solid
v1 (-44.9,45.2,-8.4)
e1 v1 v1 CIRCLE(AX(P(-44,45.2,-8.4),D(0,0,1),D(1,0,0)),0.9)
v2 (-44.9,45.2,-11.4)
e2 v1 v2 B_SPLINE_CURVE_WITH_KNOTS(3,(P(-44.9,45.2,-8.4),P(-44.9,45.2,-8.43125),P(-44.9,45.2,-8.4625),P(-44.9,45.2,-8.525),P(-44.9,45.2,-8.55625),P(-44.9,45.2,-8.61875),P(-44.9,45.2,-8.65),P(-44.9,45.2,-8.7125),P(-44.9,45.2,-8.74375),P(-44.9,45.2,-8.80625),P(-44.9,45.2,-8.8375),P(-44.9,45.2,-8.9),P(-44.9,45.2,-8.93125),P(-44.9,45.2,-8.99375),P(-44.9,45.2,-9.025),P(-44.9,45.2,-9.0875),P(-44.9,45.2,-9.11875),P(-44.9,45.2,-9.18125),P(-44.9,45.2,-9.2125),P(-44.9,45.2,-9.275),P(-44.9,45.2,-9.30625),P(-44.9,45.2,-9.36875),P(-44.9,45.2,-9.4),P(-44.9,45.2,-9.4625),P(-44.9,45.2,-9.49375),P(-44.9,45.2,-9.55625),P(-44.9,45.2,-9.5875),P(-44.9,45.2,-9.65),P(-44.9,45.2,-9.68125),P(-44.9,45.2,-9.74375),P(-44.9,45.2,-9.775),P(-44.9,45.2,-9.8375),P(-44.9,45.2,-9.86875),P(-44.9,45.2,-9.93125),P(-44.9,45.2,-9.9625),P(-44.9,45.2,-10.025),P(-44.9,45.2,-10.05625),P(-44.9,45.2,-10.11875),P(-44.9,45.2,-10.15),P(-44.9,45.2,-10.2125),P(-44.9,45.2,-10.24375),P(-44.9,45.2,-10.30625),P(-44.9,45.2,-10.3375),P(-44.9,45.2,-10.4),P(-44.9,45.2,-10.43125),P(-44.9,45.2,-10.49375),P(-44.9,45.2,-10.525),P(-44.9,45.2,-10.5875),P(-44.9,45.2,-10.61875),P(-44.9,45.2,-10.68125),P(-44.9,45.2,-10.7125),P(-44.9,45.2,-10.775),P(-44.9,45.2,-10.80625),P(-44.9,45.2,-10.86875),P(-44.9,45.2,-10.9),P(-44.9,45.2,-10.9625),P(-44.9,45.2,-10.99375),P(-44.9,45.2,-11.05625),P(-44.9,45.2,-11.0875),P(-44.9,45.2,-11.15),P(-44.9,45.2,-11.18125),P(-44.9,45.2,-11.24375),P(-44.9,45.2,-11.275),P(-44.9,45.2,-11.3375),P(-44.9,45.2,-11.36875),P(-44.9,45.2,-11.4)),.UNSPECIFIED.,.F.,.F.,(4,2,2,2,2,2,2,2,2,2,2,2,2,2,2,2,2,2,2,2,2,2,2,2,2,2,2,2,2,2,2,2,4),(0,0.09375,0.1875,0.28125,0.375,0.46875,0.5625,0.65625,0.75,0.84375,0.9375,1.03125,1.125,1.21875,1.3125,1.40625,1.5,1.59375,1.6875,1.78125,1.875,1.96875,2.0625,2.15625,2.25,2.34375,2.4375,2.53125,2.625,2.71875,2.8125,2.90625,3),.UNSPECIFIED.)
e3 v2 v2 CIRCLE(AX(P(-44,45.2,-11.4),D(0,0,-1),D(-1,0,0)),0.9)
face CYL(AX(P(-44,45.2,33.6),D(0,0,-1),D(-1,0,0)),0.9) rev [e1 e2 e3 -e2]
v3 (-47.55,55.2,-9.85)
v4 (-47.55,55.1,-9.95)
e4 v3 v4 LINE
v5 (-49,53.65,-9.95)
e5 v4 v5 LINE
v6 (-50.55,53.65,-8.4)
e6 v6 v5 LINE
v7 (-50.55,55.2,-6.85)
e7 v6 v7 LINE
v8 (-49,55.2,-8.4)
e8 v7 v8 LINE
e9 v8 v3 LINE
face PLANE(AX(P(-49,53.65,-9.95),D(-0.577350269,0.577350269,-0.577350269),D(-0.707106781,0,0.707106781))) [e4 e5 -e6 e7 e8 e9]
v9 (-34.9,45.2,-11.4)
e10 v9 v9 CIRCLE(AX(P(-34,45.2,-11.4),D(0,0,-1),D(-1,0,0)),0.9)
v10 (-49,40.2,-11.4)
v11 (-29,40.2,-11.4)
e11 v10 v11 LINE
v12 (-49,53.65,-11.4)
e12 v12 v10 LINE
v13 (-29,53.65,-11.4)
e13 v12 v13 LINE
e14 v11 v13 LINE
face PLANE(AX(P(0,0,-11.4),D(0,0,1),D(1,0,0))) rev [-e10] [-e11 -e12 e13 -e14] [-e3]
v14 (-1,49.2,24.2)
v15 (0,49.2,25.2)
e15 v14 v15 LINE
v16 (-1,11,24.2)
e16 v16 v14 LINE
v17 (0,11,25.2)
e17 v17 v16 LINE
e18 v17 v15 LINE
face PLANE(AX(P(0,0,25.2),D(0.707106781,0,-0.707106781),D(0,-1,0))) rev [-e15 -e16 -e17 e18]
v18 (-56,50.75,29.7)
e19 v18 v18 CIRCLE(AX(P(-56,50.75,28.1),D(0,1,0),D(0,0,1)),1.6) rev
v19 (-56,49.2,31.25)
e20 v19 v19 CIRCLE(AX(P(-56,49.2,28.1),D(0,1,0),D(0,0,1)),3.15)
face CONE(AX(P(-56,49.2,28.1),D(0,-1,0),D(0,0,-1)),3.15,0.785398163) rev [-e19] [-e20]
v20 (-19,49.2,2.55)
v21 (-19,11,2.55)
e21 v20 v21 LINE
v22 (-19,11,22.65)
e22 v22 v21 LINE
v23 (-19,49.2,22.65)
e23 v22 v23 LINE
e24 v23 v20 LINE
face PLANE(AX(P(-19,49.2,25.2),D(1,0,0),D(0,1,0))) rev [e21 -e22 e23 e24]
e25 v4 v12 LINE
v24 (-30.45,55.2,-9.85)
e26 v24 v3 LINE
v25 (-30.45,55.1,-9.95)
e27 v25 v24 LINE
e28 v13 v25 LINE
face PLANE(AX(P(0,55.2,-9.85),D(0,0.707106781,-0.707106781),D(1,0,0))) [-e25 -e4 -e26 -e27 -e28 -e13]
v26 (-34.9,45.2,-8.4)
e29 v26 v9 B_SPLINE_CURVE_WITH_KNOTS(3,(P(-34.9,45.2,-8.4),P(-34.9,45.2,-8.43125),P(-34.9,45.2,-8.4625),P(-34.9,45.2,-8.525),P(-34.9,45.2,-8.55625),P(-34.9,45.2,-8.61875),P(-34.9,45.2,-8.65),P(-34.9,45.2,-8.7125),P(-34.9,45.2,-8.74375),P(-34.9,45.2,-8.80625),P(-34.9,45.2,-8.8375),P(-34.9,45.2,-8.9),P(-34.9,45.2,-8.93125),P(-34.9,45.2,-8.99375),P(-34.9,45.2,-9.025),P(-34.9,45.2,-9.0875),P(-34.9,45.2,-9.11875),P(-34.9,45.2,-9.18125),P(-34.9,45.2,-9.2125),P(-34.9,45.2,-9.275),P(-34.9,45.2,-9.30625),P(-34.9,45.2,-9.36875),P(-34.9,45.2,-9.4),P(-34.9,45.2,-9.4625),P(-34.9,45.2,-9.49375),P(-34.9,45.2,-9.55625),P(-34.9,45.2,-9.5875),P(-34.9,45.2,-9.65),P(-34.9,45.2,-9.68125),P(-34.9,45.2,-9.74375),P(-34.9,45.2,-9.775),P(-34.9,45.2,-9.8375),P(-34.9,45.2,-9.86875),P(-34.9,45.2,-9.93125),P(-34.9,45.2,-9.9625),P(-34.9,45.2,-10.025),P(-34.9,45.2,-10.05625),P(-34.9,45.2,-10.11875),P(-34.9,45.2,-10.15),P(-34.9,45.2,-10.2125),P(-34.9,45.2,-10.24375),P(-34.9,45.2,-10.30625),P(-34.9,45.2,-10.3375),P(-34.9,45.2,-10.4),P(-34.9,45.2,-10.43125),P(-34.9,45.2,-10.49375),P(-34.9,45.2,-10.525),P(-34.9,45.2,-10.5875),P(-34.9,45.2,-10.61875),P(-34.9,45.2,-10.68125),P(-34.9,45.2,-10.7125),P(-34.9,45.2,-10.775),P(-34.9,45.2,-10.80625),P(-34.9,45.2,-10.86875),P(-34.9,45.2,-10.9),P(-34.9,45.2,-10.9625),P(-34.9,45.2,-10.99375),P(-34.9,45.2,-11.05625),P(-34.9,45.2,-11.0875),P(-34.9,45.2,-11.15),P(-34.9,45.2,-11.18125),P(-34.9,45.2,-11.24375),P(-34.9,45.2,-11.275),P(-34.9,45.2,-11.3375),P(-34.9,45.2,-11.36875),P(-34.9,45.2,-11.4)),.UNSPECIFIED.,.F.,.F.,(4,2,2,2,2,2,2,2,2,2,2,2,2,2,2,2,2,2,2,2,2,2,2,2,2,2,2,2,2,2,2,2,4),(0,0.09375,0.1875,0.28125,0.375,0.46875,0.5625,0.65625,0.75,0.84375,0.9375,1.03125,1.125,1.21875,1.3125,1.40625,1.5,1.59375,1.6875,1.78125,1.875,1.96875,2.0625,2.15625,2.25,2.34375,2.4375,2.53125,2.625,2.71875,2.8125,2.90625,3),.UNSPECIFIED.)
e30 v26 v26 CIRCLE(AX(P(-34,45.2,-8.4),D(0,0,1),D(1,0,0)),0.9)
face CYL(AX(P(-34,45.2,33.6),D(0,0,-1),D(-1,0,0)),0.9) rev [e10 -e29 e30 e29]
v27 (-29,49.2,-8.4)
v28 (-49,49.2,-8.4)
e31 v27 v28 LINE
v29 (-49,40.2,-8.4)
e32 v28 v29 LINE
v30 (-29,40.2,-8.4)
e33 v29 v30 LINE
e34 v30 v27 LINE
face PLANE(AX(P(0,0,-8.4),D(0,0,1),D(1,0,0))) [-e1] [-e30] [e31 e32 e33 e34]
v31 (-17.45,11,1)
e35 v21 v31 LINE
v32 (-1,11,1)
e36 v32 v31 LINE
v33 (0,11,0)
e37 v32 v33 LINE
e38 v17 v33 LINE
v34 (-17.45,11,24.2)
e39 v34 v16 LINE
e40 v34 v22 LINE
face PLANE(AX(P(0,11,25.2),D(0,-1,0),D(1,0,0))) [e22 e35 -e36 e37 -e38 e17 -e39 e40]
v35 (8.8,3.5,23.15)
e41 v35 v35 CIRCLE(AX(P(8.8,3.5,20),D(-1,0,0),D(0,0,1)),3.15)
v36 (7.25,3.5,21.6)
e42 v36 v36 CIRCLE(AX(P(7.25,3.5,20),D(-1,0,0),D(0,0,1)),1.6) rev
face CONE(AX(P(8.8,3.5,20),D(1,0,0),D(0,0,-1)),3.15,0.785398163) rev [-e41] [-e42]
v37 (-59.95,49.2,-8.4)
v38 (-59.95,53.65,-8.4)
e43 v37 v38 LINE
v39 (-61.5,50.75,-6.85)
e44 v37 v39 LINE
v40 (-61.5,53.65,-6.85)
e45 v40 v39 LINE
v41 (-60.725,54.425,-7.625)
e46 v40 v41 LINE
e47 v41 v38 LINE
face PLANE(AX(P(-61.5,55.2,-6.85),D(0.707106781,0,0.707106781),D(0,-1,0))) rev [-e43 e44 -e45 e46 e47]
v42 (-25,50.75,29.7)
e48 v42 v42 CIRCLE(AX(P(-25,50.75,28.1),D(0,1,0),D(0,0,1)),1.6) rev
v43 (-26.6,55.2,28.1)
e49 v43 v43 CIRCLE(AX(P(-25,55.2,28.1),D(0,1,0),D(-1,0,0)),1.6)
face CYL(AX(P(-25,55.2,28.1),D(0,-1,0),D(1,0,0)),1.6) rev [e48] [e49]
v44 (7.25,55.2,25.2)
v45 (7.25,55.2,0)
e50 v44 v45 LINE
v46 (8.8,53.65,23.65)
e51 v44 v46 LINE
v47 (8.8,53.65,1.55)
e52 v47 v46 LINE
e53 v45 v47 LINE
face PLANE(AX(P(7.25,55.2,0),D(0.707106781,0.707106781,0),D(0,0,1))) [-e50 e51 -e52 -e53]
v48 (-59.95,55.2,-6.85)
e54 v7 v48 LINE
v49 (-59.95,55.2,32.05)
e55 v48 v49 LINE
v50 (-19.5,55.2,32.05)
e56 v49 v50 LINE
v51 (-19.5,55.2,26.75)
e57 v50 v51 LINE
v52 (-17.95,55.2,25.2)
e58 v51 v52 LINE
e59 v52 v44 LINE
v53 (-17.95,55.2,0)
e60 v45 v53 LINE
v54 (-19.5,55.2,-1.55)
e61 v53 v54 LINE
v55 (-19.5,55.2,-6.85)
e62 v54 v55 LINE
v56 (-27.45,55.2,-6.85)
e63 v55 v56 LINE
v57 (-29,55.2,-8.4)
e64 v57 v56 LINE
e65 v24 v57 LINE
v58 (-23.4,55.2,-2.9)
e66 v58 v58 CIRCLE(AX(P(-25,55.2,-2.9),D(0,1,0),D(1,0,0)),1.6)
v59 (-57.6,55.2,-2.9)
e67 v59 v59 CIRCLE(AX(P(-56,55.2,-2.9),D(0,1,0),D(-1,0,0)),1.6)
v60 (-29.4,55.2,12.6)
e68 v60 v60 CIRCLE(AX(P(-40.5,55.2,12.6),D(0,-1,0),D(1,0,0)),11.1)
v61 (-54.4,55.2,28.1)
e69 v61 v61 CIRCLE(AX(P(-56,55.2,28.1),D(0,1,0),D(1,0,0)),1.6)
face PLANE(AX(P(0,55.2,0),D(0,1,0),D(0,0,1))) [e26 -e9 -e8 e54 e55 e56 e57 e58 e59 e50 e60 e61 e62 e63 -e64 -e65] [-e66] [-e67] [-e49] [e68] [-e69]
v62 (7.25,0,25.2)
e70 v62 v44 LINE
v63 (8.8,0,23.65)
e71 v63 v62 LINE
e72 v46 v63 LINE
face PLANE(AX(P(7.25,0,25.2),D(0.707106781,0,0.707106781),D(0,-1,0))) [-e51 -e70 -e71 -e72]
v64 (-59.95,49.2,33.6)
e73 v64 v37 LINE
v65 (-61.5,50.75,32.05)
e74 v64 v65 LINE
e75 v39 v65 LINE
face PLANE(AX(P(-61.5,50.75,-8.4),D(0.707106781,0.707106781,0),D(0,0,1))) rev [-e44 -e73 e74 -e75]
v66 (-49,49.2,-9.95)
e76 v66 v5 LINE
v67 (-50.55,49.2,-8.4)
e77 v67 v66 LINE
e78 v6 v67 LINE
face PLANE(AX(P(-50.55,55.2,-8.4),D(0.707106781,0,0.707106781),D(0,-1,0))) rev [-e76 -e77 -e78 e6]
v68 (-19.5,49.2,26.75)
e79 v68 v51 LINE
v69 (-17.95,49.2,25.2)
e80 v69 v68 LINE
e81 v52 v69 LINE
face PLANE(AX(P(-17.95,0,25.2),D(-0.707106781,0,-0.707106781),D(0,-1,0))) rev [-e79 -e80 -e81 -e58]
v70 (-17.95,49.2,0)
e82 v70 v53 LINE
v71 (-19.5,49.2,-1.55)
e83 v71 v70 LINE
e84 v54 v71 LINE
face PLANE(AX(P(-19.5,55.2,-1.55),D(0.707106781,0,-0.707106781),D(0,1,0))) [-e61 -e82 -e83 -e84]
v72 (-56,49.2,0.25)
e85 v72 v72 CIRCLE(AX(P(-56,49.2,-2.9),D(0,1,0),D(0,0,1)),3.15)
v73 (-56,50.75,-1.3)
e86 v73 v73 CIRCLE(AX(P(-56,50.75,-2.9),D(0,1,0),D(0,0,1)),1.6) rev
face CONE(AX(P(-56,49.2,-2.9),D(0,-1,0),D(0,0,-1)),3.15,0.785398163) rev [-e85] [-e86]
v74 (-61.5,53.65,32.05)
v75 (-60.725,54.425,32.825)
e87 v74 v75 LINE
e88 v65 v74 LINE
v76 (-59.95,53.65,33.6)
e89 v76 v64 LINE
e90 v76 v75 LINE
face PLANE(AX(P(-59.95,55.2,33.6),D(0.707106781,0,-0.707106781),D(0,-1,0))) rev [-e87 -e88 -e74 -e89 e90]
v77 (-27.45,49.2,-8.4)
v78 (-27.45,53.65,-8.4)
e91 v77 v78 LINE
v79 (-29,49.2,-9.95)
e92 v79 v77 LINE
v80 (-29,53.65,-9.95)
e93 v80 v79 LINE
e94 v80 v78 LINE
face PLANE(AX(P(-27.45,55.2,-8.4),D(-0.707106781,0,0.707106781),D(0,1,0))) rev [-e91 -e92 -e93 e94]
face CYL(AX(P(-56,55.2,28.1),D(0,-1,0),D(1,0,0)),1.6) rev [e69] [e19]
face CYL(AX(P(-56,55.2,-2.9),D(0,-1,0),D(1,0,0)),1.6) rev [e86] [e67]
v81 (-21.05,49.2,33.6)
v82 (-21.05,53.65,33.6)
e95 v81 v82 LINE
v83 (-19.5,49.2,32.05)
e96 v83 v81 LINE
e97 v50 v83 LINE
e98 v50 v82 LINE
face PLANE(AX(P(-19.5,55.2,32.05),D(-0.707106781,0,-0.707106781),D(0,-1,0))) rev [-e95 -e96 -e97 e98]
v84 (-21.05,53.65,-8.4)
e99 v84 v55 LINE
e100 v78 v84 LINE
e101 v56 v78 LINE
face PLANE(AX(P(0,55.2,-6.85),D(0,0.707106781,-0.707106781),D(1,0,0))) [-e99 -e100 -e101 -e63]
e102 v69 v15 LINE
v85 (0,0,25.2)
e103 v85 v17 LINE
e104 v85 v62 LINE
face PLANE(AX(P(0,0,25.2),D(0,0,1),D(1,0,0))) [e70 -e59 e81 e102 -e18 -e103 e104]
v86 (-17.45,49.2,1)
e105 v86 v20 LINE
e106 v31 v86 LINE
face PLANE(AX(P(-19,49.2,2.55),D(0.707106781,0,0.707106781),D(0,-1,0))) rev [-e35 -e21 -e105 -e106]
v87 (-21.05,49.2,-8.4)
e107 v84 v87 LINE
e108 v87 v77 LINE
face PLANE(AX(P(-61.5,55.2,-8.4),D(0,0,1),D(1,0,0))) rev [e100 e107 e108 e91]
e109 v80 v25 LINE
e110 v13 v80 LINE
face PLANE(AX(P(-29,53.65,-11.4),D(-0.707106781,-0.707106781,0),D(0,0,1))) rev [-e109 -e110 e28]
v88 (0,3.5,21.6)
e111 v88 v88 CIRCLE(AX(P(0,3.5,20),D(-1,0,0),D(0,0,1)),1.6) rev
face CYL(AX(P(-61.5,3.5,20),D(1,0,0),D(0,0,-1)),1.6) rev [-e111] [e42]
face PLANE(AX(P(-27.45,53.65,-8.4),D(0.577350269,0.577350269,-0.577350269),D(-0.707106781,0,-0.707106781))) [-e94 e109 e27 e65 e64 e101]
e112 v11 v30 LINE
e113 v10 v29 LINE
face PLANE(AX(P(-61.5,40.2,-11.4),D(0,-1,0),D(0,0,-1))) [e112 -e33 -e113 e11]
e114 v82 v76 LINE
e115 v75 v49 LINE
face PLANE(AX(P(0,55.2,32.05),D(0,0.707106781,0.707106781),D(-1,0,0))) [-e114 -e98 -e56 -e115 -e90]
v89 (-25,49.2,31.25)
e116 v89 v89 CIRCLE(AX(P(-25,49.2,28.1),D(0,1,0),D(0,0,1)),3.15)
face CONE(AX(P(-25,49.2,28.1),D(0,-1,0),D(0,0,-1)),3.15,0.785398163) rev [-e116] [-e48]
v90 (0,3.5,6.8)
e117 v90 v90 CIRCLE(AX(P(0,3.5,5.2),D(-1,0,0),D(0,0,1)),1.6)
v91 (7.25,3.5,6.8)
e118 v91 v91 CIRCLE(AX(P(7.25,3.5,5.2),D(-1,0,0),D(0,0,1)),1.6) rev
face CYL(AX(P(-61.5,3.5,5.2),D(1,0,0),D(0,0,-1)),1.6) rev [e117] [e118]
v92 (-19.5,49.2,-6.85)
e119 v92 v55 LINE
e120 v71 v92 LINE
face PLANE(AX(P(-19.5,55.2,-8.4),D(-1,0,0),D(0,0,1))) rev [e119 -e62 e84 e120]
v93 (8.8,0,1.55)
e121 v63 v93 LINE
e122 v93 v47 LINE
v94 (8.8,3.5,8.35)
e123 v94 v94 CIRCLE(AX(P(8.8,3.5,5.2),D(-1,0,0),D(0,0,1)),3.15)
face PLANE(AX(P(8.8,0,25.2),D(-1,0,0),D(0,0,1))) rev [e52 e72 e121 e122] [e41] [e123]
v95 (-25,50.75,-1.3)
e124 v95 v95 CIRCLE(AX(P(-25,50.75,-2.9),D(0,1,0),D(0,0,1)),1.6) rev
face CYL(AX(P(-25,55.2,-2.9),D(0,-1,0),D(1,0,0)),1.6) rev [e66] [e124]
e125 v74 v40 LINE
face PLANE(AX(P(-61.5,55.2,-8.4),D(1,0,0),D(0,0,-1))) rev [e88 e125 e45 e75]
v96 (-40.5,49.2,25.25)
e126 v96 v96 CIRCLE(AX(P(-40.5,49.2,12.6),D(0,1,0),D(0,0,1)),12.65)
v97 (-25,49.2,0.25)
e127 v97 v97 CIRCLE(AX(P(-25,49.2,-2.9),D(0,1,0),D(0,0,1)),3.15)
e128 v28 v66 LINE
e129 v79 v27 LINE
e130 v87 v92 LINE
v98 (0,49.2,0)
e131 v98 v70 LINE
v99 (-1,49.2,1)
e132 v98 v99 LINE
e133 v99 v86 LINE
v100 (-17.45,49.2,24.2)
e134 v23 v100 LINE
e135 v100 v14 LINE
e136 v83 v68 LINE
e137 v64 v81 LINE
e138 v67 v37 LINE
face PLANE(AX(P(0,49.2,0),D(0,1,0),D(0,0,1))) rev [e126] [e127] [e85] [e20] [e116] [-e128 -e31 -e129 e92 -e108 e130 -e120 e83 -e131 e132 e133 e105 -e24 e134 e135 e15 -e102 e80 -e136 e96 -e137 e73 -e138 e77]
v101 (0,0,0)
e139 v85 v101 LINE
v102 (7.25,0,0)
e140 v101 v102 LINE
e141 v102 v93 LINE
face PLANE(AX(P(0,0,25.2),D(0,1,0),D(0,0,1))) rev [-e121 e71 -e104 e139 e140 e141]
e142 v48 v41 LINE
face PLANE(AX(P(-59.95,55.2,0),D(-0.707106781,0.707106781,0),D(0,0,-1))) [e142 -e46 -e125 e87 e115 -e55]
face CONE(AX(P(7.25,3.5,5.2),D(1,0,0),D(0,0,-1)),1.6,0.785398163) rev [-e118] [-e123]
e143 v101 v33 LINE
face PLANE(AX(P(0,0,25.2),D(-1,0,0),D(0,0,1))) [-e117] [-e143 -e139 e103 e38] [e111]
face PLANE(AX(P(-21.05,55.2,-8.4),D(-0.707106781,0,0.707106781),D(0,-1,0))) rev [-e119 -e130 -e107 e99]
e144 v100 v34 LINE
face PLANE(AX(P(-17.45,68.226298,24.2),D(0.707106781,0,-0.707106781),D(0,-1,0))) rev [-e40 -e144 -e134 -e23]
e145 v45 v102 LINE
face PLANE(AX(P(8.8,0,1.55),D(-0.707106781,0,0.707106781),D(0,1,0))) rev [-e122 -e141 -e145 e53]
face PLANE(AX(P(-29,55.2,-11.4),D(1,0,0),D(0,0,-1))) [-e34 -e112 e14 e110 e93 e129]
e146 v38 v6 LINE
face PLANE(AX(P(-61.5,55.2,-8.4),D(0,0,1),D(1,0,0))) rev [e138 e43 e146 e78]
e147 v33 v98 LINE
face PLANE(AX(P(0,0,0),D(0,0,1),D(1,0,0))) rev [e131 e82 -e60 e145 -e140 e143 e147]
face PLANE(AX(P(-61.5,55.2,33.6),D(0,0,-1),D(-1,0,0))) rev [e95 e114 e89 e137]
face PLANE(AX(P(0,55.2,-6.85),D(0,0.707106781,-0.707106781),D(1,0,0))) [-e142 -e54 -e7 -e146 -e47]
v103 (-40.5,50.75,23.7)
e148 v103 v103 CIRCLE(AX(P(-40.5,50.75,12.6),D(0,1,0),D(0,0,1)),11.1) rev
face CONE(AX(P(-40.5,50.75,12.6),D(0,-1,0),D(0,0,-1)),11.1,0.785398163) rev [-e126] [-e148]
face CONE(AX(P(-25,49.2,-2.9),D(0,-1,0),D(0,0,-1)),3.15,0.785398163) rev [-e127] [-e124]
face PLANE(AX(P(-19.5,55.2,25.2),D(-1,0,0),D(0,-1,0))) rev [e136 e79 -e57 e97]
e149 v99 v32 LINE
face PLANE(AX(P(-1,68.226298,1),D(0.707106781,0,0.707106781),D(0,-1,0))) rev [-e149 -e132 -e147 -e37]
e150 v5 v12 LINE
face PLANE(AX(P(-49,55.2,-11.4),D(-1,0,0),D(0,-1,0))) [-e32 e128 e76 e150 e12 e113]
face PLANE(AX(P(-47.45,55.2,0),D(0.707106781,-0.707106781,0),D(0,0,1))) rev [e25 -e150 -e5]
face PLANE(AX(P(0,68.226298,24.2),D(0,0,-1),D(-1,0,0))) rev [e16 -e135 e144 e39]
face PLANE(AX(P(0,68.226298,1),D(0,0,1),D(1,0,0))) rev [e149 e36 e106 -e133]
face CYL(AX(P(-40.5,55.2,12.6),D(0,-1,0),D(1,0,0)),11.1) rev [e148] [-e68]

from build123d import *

# Parameters (mm, degrees)
BOSS_EXTRUDE1_DEPTH = 25.2
SKETCH2_R           = 1.6
BOSS_EXTRUDE2_DEPTH = 6
SKETCH3_W           = 19
SKETCH3_H           = 1
CUT_EXTRUDE1_DEPTH  = 38.2
CHAMFER2_SIZE       = 1.55
SKETCH4_R           = 11.1
CUT_EXTRUDE2_DEPTH  = 86.626222619
CHAMFER3_SIZE       = 1.55
CHAMFER4_SIZE       = 1
SKETCH5_R           = 1.6
CUT_EXTRUDE3_DEPTH  = 96.48869043
CHAMFER5_SIZE       = 1.55
BOSS_EXTRUDE3_START = -42
SKETCH6_W           = 20
SKETCH6_H           = 15
BOSS_EXTRUDE3_DEPTH = 3
SKETCH7_R           = 0.9
CUT_EXTRUDE4_DEPTH  = 95.097236941
CHAMFER7_SIZE       = 1.55
CHAMFER8_SIZE       = 1.55


with BuildPart() as part:
    # Sketch1 → Boss-Extrude1 (new body)
    with BuildSketch(Plane.XY):
        Polygon((0, 0), (0, 11), (-19, 11), (-19, 49.2), (8.8, 49.2), (8.8, 0), align=None)
    extrude(amount=BOSS_EXTRUDE1_DEPTH)

    # Sketch2 → Boss-Extrude2 (add)
    with BuildSketch(Plane(origin=(0, 49.2, 0), x_dir=(1, 0, 0), z_dir=(0, 1, 0))):
        Polygon((-61.5, 8.4), (-19.5, 8.4), (-19.5, 0), (8.8, 0), (8.8, -25.2), (-19.5, -25.2), (-19.5, -33.6), (-61.5, -33.6), align=None)
        with Locations(Location((-56, 2.9, 0), (0, 0, 180))):
            Circle(SKETCH2_R, mode=Mode.SUBTRACT)
        with Locations((-56, -28.1)):
            Circle(SKETCH2_R, mode=Mode.SUBTRACT)
        with Locations(Location((-25, -28.1, 0), (0, 0, 180))):
            Circle(SKETCH2_R, mode=Mode.SUBTRACT)
        with Locations((-25, 2.9)):
            Circle(SKETCH2_R, mode=Mode.SUBTRACT)
    extrude(amount=BOSS_EXTRUDE2_DEPTH)

    # Sketch3 → Cut-Extrude1 (cut)
    with BuildSketch(Plane.XZ.offset(-11)):
        with Locations((-9.5, 24.7)):
            Rectangle(SKETCH3_W, SKETCH3_H)
        with Locations((-9.5, 0.5)):
            Rectangle(SKETCH3_W, SKETCH3_H)
    extrude(amount=-CUT_EXTRUDE1_DEPTH, mode=Mode.SUBTRACT)

    # Chamfer2
    chamfer2_edges = [part.edges().sort_by_distance(p)[0] for p in [
        (-54.4, 49.2, -2.9),
        (-57.6, 49.2, 28.1),
        (-23.4, 49.2, 28.1),
        (-26.6, 49.2, -2.9),
    ]]
    chamfer(chamfer2_edges, length=CHAMFER2_SIZE)

    # Sketch4 → Cut-Extrude2 (cut, through all)
    with BuildSketch(Plane.XZ.offset(-49.2)):
        with Locations((-40.5, 12.6)):
            Circle(SKETCH4_R)
    extrude(amount=-CUT_EXTRUDE2_DEPTH, mode=Mode.SUBTRACT)

    # Chamfer3
    chamfer3_edges = [part.edges().sort_by_distance(p)[0] for p in [
        (8.8, 55.2, 12.6),
        (-61.5, 55.2, 12.6),
        (-19.5, 52.2, 0),
        (-19.5, 52.2, -8.4),
        (-61.5, 49.2, 12.6),
        (-61.5, 52.2, -8.4),
        (-61.5, 52.2, 33.6),
        (-19.5, 52.2, 33.6),
        (-19.5, 52.2, 25.2),
        (8.8, 27.6, 25.2),
        (-19, 30.1, 24.2),
        (-19, 30.1, 1),
        (8.8, 27.6, 0),
        (-51.6, 49.2, 12.6),
    ]]
    chamfer(chamfer3_edges, length=CHAMFER3_SIZE)

    # Chamfer4
    chamfer4_edges = [part.edges().sort_by_distance(p)[0] for p in [
        (0, 30.1, 24.2),
        (0, 30.1, 1),
    ]]
    chamfer(chamfer4_edges, length=CHAMFER4_SIZE - 0.0001)  # a hair under: the kernel refuses the full size

    # Sketch5 → Cut-Extrude3 (cut, through all)
    with BuildSketch(Plane(origin=(8.8, 0, 0), x_dir=(0, 0, -1), z_dir=(1, 0, 0))):
        with Locations((-5.2, 3.5)):
            Circle(SKETCH5_R)
        with Locations(Location((-20, 3.5, 0), (0, 0, 180))):
            Circle(SKETCH5_R)
    extrude(amount=-CUT_EXTRUDE3_DEPTH, mode=Mode.SUBTRACT)

    # Chamfer5
    chamfer5_edges = [part.edges().sort_by_distance(p)[0] for p in [
        (8.8, 3.5, 18.4),
        (8.8, 3.5, 6.8),
    ]]
    chamfer(chamfer5_edges, length=CHAMFER5_SIZE)

    # Sketch6 → Boss-Extrude3 (add)
    with BuildSketch(Plane.XY.offset(33.6).offset(BOSS_EXTRUDE3_START)):
        with Locations((-39, 47.7)):
            Rectangle(SKETCH6_W, SKETCH6_H)
    extrude(amount=-BOSS_EXTRUDE3_DEPTH)

    # Sketch7 → Cut-Extrude4 (cut, through all)
    with BuildSketch(Plane(origin=(0, 0, -11.4), x_dir=(-1, 0, 0), z_dir=(0, 0, -1))):
        with Locations((44, 45.2)):
            Circle(SKETCH7_R)
        with Locations((34, 45.2)):
            Circle(SKETCH7_R)
    extrude(amount=-CUT_EXTRUDE4_DEPTH, mode=Mode.SUBTRACT)

    # Chamfer7
    chamfer7_edges = [part.edges().sort_by_distance(p)[0] for p in [
        (-40.5, 55.2, 33.6),
        (-29, 55.2, -9.9),
        (-49, 55.2, -9.9),
        (-29, 52.2, -8.4),
        (-25.025, 55.2, -8.4),
        (-49, 52.2, -8.4),
        (-54.475, 55.2, -8.4),
    ]]
    chamfer(chamfer7_edges, length=CHAMFER7_SIZE)

    # Chamfer8
    chamfer8_edges = [part.edges().sort_by_distance(p)[0] for p in [
        (-39, 55.2, -11.4),
    ]]
    chamfer(chamfer8_edges, length=CHAMFER8_SIZE)


solid = part.part
